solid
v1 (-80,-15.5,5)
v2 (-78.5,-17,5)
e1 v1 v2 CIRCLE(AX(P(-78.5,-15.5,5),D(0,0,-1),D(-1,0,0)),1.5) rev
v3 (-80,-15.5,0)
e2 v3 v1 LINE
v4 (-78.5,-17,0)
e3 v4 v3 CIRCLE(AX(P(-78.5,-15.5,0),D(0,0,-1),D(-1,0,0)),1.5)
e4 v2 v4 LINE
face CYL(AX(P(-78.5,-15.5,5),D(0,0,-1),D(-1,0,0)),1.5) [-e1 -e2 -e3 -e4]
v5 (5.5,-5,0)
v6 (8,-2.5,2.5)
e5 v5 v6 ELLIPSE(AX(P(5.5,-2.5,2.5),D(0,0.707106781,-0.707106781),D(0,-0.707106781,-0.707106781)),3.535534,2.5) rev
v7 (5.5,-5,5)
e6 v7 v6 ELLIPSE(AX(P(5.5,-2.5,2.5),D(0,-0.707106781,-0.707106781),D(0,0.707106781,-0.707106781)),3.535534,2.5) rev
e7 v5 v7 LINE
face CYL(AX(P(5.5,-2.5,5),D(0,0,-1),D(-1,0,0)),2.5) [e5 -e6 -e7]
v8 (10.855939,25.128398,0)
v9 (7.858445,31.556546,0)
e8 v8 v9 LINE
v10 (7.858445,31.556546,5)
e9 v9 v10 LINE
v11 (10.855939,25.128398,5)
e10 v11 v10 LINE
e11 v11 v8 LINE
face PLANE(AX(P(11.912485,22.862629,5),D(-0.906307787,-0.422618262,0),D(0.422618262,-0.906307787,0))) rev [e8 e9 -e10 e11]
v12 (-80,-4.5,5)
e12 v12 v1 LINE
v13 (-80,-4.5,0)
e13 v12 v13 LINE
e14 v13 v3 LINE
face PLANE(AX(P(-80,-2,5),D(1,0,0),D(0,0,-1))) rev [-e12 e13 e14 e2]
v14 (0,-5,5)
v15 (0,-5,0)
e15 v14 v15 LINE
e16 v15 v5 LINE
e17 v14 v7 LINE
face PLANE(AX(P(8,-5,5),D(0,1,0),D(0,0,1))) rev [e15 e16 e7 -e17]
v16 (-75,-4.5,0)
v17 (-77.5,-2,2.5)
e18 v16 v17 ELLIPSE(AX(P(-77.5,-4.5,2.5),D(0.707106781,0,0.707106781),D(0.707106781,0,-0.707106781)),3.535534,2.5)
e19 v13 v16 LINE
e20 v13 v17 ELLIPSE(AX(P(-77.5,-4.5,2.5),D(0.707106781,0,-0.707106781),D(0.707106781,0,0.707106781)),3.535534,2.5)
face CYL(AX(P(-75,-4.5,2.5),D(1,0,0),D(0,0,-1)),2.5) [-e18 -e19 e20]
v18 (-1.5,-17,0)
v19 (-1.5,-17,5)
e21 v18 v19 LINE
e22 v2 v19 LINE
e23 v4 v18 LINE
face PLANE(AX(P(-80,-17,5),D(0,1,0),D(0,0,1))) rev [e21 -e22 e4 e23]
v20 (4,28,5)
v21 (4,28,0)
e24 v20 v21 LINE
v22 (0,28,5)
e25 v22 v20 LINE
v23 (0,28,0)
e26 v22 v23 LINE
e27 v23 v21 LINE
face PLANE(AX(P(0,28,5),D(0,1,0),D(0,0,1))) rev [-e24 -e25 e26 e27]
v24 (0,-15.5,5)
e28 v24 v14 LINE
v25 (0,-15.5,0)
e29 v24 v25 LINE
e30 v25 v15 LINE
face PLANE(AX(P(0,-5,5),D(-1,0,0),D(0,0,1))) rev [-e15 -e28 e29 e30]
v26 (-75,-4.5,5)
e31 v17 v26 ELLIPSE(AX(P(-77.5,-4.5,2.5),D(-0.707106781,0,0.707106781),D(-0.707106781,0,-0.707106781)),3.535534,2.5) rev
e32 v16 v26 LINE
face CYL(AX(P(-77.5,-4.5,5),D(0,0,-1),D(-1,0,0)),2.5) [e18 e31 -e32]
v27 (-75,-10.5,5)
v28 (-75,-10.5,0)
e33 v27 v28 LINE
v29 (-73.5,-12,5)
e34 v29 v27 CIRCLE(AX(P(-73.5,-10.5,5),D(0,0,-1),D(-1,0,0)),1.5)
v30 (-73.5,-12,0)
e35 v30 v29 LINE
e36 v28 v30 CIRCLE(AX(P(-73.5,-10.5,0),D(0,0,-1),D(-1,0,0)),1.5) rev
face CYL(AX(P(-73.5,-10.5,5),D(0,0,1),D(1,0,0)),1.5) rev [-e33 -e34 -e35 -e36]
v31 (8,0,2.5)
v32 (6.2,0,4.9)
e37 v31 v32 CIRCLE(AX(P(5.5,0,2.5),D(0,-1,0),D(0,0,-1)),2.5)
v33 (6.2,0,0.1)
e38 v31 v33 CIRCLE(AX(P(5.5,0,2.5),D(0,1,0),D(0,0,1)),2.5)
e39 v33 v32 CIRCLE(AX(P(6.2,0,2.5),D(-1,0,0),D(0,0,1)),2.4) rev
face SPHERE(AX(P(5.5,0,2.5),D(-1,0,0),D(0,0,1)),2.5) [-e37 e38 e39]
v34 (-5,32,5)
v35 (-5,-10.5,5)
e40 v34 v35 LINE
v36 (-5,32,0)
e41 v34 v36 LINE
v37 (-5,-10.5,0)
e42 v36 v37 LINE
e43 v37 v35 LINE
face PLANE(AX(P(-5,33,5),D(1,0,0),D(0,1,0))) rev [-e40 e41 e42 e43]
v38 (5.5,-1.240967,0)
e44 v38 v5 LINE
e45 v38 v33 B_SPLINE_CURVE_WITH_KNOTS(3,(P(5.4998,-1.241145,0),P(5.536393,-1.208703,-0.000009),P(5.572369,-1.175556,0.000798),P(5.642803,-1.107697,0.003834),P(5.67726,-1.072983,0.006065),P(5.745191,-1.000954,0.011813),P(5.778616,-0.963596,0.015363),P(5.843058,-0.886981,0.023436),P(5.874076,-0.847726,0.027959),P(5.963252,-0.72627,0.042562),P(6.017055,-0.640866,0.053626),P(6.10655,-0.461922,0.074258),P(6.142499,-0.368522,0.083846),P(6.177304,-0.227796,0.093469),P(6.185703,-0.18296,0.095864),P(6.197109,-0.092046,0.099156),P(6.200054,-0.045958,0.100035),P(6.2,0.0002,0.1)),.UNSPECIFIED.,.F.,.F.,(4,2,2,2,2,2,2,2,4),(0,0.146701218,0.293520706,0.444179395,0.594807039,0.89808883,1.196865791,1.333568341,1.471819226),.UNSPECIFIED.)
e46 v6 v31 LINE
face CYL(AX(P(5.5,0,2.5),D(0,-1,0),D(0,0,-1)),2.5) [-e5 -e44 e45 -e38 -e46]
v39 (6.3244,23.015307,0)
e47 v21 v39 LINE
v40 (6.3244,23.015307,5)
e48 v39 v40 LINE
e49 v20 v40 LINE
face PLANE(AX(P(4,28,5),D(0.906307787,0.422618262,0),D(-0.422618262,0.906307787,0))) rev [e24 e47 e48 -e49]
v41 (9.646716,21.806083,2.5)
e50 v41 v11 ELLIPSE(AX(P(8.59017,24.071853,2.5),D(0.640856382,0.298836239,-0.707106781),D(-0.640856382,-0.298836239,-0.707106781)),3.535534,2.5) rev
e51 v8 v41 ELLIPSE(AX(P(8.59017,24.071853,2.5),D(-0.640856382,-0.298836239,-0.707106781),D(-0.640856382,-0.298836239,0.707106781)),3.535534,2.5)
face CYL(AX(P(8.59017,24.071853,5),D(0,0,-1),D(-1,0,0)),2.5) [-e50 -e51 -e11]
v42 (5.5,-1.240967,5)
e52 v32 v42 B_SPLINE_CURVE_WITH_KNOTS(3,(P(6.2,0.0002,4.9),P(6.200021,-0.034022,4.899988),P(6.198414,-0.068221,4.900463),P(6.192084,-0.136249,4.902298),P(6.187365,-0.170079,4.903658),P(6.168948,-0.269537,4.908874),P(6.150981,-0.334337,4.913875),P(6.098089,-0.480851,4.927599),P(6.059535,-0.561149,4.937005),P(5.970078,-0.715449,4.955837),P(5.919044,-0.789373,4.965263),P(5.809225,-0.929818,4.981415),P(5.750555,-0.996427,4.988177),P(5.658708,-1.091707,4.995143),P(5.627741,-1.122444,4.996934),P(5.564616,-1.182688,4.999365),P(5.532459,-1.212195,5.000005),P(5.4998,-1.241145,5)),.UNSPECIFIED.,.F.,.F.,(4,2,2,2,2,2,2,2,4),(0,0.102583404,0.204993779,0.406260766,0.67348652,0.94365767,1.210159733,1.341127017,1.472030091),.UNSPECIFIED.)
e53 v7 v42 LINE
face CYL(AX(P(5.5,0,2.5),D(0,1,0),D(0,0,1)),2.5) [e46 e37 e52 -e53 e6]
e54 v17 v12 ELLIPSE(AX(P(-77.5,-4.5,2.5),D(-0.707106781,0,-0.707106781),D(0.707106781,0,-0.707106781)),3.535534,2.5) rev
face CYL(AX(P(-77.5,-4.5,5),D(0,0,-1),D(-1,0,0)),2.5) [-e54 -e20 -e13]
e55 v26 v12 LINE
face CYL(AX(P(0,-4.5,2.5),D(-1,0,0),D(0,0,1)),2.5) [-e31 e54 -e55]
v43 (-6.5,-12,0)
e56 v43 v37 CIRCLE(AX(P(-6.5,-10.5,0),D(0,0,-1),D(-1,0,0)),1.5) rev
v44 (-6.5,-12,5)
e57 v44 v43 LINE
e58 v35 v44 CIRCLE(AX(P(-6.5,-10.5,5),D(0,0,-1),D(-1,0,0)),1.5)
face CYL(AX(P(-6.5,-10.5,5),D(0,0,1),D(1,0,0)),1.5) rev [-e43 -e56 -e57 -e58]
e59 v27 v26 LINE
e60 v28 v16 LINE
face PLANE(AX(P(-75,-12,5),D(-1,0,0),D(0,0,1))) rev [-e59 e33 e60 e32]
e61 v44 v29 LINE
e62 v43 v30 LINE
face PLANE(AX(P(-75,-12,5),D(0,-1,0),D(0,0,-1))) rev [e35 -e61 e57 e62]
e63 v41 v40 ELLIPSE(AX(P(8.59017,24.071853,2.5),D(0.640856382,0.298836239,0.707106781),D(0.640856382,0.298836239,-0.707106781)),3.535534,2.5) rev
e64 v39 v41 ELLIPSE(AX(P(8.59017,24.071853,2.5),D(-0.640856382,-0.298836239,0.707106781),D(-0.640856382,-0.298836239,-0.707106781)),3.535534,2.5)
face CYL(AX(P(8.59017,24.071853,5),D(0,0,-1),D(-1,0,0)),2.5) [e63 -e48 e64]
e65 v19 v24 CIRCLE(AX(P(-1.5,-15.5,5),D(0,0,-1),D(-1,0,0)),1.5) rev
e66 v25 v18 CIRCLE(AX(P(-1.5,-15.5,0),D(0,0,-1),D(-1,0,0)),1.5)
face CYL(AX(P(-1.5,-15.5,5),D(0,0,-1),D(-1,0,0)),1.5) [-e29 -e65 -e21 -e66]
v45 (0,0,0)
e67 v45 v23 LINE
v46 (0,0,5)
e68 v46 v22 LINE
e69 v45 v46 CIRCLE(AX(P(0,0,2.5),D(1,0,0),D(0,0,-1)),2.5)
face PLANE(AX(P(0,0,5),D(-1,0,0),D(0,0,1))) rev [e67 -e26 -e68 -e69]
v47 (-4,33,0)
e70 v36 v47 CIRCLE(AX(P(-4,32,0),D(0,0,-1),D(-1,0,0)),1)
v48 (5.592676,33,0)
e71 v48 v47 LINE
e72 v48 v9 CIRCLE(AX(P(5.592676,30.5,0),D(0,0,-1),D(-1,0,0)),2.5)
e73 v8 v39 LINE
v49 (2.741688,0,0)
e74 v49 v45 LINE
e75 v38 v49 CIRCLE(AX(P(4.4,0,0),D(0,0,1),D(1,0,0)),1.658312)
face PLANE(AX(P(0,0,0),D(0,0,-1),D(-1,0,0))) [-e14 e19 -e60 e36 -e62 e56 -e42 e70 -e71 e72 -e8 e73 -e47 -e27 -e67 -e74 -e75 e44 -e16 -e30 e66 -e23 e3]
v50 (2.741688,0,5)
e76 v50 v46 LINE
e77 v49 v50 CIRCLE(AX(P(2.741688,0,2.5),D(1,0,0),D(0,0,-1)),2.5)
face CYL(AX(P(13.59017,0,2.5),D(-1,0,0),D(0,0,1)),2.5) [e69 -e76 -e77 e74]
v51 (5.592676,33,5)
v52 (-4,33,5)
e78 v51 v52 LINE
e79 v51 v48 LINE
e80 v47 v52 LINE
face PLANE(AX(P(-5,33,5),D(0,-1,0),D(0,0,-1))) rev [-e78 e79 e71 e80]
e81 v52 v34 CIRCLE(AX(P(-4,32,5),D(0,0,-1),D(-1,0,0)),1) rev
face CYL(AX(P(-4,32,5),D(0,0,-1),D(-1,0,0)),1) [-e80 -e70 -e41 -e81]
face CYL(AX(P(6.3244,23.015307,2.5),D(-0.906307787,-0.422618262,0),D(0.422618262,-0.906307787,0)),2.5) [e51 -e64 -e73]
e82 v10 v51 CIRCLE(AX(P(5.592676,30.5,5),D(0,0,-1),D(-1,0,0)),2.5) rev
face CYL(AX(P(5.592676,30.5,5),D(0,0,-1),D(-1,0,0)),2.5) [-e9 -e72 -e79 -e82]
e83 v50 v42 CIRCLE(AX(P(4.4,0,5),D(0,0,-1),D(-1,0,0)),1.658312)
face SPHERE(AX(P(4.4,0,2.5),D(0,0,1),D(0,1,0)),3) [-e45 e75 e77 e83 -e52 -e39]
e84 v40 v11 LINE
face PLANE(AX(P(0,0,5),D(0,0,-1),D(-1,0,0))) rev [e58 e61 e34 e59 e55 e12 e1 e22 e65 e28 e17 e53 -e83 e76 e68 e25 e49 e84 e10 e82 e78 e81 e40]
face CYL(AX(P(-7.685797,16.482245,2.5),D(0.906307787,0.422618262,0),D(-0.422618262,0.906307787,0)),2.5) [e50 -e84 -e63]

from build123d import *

# Parameters (mm, degrees)
EXTRUDE_1_DEPTH     = 5
FILLET_1_R          = 2.5
FILLET_2_R          = 1
EXTRUDE_2_DEPTH     = 8
FILLET_3_R          = 2.5
SKETCH_5_W          = 1.467751534
SKETCH_5_H          = 4.178210798
SKETCH_5_W_2        = 1.389566385
CUT_EXTRUDE_1_DEPTH = 20
FILLET_4_R          = 1.5
FILLET_5_R          = 1.5


with BuildPart() as part:
    # 草图1 → 凸台-拉伸1 (new body)
    with BuildSketch(Plane.XY):
        Polygon((0, 0), (0, 28), (4, 28), (7.380946094, 20.749537704), (11.912485029, 22.862629012), (7.185351304, 33), (-5, 33), (-5, -12), (-75, -12), (-75, -2), (-80, -2), (-80, -17), (0, -17), (0, -5), (8, -5), (8, 0), align=None)
    extrude(amount=EXTRUDE_1_DEPTH)

    # 圆角1
    fillet_1_edges = [part.edges().sort_by_distance(p)[0] for p in [
        (-77.5, -2, 0),
        (9.646715562, 21.806083358, 0),
        (9.646715562, 21.806083358, 5),
        (-80, -2, 2.5),
        (-75, -2, 2.5),
        (7.185351304, 33, 2.5),
        (11.912485029, 22.862629012, 2.5),
        (7.380946094, 20.749537704, 2.5),
        (-77.5, -2, 5),
    ]]
    fillet(fillet_1_edges, radius=FILLET_1_R - 0.0001)  # a hair under: the kernel refuses the full size

    # 圆角2
    fillet_2_edges = [part.edges().sort_by_distance(p)[0] for p in [
        (-5, 33, 2.5),
    ]]
    fillet(fillet_2_edges, radius=FILLET_2_R)

    # 草图3 → 凸台-拉伸2 (add)
    with BuildSketch(Plane(origin=(0, 0, 0), x_dir=(0, 0, -1), z_dir=(1, 0, 0))):
        with BuildLine():
            Line((-5, 0), (0, 0))
            ThreePointArc((0, 0), (-2.5, 2.5), (-5, 0))
        make_face()
    extrude(amount=EXTRUDE_2_DEPTH)

    # 圆角3
    fillet_3_edges = [part.edges().sort_by_distance(p)[0] for p in [
        (8, -2.5, 0),
        (8, -5, 2.5),
        (8, -2.5, 5),
        (8, 2.5, 2.5),
    ]]
    fillet(fillet_3_edges, radius=FILLET_3_R - 0.0001)  # a hair under: the kernel refuses the full size

    # 草图4 → 旋转3 (revolve)
    with BuildSketch(Plane(origin=(4.4, 0, 0), x_dir=(0, 0, -1), z_dir=(1, 0, 0))):
        with BuildLine():
            Line((-5.5, 0), (0.5, 0))
            ThreePointArc((0.5, 0), (-2.5, 3), (-5.5, 0))
        make_face()
    revolve(axis=Axis((4.4, 0, 2.5), (0, 0, -1)))

    # 草图5 → 切除-拉伸1 (cut)
    with BuildSketch(Plane.ZY.offset(5)):
        with Locations((-0.733875767, -0.010051234)):
            Rectangle(SKETCH_5_W, SKETCH_5_H)
        with Locations((5.694783193, -0.010051234)):
            Rectangle(SKETCH_5_W_2, SKETCH_5_H)
    extrude(amount=-CUT_EXTRUDE_1_DEPTH, mode=Mode.SUBTRACT)

    # 圆角4
    fillet_4_edges = [part.edges().sort_by_distance(p)[0] for p in [
        (-75, -12, 2.5),
        (-5, -12, 2.5),
    ]]
    fillet(fillet_4_edges, radius=FILLET_4_R)

    # 圆角5
    fillet_5_edges = [part.edges().sort_by_distance(p)[0] for p in [
        (0, -17, 2.5),
        (-80, -17, 2.5),
    ]]
    fillet(fillet_5_edges, radius=FILLET_5_R)


solid = part.part
